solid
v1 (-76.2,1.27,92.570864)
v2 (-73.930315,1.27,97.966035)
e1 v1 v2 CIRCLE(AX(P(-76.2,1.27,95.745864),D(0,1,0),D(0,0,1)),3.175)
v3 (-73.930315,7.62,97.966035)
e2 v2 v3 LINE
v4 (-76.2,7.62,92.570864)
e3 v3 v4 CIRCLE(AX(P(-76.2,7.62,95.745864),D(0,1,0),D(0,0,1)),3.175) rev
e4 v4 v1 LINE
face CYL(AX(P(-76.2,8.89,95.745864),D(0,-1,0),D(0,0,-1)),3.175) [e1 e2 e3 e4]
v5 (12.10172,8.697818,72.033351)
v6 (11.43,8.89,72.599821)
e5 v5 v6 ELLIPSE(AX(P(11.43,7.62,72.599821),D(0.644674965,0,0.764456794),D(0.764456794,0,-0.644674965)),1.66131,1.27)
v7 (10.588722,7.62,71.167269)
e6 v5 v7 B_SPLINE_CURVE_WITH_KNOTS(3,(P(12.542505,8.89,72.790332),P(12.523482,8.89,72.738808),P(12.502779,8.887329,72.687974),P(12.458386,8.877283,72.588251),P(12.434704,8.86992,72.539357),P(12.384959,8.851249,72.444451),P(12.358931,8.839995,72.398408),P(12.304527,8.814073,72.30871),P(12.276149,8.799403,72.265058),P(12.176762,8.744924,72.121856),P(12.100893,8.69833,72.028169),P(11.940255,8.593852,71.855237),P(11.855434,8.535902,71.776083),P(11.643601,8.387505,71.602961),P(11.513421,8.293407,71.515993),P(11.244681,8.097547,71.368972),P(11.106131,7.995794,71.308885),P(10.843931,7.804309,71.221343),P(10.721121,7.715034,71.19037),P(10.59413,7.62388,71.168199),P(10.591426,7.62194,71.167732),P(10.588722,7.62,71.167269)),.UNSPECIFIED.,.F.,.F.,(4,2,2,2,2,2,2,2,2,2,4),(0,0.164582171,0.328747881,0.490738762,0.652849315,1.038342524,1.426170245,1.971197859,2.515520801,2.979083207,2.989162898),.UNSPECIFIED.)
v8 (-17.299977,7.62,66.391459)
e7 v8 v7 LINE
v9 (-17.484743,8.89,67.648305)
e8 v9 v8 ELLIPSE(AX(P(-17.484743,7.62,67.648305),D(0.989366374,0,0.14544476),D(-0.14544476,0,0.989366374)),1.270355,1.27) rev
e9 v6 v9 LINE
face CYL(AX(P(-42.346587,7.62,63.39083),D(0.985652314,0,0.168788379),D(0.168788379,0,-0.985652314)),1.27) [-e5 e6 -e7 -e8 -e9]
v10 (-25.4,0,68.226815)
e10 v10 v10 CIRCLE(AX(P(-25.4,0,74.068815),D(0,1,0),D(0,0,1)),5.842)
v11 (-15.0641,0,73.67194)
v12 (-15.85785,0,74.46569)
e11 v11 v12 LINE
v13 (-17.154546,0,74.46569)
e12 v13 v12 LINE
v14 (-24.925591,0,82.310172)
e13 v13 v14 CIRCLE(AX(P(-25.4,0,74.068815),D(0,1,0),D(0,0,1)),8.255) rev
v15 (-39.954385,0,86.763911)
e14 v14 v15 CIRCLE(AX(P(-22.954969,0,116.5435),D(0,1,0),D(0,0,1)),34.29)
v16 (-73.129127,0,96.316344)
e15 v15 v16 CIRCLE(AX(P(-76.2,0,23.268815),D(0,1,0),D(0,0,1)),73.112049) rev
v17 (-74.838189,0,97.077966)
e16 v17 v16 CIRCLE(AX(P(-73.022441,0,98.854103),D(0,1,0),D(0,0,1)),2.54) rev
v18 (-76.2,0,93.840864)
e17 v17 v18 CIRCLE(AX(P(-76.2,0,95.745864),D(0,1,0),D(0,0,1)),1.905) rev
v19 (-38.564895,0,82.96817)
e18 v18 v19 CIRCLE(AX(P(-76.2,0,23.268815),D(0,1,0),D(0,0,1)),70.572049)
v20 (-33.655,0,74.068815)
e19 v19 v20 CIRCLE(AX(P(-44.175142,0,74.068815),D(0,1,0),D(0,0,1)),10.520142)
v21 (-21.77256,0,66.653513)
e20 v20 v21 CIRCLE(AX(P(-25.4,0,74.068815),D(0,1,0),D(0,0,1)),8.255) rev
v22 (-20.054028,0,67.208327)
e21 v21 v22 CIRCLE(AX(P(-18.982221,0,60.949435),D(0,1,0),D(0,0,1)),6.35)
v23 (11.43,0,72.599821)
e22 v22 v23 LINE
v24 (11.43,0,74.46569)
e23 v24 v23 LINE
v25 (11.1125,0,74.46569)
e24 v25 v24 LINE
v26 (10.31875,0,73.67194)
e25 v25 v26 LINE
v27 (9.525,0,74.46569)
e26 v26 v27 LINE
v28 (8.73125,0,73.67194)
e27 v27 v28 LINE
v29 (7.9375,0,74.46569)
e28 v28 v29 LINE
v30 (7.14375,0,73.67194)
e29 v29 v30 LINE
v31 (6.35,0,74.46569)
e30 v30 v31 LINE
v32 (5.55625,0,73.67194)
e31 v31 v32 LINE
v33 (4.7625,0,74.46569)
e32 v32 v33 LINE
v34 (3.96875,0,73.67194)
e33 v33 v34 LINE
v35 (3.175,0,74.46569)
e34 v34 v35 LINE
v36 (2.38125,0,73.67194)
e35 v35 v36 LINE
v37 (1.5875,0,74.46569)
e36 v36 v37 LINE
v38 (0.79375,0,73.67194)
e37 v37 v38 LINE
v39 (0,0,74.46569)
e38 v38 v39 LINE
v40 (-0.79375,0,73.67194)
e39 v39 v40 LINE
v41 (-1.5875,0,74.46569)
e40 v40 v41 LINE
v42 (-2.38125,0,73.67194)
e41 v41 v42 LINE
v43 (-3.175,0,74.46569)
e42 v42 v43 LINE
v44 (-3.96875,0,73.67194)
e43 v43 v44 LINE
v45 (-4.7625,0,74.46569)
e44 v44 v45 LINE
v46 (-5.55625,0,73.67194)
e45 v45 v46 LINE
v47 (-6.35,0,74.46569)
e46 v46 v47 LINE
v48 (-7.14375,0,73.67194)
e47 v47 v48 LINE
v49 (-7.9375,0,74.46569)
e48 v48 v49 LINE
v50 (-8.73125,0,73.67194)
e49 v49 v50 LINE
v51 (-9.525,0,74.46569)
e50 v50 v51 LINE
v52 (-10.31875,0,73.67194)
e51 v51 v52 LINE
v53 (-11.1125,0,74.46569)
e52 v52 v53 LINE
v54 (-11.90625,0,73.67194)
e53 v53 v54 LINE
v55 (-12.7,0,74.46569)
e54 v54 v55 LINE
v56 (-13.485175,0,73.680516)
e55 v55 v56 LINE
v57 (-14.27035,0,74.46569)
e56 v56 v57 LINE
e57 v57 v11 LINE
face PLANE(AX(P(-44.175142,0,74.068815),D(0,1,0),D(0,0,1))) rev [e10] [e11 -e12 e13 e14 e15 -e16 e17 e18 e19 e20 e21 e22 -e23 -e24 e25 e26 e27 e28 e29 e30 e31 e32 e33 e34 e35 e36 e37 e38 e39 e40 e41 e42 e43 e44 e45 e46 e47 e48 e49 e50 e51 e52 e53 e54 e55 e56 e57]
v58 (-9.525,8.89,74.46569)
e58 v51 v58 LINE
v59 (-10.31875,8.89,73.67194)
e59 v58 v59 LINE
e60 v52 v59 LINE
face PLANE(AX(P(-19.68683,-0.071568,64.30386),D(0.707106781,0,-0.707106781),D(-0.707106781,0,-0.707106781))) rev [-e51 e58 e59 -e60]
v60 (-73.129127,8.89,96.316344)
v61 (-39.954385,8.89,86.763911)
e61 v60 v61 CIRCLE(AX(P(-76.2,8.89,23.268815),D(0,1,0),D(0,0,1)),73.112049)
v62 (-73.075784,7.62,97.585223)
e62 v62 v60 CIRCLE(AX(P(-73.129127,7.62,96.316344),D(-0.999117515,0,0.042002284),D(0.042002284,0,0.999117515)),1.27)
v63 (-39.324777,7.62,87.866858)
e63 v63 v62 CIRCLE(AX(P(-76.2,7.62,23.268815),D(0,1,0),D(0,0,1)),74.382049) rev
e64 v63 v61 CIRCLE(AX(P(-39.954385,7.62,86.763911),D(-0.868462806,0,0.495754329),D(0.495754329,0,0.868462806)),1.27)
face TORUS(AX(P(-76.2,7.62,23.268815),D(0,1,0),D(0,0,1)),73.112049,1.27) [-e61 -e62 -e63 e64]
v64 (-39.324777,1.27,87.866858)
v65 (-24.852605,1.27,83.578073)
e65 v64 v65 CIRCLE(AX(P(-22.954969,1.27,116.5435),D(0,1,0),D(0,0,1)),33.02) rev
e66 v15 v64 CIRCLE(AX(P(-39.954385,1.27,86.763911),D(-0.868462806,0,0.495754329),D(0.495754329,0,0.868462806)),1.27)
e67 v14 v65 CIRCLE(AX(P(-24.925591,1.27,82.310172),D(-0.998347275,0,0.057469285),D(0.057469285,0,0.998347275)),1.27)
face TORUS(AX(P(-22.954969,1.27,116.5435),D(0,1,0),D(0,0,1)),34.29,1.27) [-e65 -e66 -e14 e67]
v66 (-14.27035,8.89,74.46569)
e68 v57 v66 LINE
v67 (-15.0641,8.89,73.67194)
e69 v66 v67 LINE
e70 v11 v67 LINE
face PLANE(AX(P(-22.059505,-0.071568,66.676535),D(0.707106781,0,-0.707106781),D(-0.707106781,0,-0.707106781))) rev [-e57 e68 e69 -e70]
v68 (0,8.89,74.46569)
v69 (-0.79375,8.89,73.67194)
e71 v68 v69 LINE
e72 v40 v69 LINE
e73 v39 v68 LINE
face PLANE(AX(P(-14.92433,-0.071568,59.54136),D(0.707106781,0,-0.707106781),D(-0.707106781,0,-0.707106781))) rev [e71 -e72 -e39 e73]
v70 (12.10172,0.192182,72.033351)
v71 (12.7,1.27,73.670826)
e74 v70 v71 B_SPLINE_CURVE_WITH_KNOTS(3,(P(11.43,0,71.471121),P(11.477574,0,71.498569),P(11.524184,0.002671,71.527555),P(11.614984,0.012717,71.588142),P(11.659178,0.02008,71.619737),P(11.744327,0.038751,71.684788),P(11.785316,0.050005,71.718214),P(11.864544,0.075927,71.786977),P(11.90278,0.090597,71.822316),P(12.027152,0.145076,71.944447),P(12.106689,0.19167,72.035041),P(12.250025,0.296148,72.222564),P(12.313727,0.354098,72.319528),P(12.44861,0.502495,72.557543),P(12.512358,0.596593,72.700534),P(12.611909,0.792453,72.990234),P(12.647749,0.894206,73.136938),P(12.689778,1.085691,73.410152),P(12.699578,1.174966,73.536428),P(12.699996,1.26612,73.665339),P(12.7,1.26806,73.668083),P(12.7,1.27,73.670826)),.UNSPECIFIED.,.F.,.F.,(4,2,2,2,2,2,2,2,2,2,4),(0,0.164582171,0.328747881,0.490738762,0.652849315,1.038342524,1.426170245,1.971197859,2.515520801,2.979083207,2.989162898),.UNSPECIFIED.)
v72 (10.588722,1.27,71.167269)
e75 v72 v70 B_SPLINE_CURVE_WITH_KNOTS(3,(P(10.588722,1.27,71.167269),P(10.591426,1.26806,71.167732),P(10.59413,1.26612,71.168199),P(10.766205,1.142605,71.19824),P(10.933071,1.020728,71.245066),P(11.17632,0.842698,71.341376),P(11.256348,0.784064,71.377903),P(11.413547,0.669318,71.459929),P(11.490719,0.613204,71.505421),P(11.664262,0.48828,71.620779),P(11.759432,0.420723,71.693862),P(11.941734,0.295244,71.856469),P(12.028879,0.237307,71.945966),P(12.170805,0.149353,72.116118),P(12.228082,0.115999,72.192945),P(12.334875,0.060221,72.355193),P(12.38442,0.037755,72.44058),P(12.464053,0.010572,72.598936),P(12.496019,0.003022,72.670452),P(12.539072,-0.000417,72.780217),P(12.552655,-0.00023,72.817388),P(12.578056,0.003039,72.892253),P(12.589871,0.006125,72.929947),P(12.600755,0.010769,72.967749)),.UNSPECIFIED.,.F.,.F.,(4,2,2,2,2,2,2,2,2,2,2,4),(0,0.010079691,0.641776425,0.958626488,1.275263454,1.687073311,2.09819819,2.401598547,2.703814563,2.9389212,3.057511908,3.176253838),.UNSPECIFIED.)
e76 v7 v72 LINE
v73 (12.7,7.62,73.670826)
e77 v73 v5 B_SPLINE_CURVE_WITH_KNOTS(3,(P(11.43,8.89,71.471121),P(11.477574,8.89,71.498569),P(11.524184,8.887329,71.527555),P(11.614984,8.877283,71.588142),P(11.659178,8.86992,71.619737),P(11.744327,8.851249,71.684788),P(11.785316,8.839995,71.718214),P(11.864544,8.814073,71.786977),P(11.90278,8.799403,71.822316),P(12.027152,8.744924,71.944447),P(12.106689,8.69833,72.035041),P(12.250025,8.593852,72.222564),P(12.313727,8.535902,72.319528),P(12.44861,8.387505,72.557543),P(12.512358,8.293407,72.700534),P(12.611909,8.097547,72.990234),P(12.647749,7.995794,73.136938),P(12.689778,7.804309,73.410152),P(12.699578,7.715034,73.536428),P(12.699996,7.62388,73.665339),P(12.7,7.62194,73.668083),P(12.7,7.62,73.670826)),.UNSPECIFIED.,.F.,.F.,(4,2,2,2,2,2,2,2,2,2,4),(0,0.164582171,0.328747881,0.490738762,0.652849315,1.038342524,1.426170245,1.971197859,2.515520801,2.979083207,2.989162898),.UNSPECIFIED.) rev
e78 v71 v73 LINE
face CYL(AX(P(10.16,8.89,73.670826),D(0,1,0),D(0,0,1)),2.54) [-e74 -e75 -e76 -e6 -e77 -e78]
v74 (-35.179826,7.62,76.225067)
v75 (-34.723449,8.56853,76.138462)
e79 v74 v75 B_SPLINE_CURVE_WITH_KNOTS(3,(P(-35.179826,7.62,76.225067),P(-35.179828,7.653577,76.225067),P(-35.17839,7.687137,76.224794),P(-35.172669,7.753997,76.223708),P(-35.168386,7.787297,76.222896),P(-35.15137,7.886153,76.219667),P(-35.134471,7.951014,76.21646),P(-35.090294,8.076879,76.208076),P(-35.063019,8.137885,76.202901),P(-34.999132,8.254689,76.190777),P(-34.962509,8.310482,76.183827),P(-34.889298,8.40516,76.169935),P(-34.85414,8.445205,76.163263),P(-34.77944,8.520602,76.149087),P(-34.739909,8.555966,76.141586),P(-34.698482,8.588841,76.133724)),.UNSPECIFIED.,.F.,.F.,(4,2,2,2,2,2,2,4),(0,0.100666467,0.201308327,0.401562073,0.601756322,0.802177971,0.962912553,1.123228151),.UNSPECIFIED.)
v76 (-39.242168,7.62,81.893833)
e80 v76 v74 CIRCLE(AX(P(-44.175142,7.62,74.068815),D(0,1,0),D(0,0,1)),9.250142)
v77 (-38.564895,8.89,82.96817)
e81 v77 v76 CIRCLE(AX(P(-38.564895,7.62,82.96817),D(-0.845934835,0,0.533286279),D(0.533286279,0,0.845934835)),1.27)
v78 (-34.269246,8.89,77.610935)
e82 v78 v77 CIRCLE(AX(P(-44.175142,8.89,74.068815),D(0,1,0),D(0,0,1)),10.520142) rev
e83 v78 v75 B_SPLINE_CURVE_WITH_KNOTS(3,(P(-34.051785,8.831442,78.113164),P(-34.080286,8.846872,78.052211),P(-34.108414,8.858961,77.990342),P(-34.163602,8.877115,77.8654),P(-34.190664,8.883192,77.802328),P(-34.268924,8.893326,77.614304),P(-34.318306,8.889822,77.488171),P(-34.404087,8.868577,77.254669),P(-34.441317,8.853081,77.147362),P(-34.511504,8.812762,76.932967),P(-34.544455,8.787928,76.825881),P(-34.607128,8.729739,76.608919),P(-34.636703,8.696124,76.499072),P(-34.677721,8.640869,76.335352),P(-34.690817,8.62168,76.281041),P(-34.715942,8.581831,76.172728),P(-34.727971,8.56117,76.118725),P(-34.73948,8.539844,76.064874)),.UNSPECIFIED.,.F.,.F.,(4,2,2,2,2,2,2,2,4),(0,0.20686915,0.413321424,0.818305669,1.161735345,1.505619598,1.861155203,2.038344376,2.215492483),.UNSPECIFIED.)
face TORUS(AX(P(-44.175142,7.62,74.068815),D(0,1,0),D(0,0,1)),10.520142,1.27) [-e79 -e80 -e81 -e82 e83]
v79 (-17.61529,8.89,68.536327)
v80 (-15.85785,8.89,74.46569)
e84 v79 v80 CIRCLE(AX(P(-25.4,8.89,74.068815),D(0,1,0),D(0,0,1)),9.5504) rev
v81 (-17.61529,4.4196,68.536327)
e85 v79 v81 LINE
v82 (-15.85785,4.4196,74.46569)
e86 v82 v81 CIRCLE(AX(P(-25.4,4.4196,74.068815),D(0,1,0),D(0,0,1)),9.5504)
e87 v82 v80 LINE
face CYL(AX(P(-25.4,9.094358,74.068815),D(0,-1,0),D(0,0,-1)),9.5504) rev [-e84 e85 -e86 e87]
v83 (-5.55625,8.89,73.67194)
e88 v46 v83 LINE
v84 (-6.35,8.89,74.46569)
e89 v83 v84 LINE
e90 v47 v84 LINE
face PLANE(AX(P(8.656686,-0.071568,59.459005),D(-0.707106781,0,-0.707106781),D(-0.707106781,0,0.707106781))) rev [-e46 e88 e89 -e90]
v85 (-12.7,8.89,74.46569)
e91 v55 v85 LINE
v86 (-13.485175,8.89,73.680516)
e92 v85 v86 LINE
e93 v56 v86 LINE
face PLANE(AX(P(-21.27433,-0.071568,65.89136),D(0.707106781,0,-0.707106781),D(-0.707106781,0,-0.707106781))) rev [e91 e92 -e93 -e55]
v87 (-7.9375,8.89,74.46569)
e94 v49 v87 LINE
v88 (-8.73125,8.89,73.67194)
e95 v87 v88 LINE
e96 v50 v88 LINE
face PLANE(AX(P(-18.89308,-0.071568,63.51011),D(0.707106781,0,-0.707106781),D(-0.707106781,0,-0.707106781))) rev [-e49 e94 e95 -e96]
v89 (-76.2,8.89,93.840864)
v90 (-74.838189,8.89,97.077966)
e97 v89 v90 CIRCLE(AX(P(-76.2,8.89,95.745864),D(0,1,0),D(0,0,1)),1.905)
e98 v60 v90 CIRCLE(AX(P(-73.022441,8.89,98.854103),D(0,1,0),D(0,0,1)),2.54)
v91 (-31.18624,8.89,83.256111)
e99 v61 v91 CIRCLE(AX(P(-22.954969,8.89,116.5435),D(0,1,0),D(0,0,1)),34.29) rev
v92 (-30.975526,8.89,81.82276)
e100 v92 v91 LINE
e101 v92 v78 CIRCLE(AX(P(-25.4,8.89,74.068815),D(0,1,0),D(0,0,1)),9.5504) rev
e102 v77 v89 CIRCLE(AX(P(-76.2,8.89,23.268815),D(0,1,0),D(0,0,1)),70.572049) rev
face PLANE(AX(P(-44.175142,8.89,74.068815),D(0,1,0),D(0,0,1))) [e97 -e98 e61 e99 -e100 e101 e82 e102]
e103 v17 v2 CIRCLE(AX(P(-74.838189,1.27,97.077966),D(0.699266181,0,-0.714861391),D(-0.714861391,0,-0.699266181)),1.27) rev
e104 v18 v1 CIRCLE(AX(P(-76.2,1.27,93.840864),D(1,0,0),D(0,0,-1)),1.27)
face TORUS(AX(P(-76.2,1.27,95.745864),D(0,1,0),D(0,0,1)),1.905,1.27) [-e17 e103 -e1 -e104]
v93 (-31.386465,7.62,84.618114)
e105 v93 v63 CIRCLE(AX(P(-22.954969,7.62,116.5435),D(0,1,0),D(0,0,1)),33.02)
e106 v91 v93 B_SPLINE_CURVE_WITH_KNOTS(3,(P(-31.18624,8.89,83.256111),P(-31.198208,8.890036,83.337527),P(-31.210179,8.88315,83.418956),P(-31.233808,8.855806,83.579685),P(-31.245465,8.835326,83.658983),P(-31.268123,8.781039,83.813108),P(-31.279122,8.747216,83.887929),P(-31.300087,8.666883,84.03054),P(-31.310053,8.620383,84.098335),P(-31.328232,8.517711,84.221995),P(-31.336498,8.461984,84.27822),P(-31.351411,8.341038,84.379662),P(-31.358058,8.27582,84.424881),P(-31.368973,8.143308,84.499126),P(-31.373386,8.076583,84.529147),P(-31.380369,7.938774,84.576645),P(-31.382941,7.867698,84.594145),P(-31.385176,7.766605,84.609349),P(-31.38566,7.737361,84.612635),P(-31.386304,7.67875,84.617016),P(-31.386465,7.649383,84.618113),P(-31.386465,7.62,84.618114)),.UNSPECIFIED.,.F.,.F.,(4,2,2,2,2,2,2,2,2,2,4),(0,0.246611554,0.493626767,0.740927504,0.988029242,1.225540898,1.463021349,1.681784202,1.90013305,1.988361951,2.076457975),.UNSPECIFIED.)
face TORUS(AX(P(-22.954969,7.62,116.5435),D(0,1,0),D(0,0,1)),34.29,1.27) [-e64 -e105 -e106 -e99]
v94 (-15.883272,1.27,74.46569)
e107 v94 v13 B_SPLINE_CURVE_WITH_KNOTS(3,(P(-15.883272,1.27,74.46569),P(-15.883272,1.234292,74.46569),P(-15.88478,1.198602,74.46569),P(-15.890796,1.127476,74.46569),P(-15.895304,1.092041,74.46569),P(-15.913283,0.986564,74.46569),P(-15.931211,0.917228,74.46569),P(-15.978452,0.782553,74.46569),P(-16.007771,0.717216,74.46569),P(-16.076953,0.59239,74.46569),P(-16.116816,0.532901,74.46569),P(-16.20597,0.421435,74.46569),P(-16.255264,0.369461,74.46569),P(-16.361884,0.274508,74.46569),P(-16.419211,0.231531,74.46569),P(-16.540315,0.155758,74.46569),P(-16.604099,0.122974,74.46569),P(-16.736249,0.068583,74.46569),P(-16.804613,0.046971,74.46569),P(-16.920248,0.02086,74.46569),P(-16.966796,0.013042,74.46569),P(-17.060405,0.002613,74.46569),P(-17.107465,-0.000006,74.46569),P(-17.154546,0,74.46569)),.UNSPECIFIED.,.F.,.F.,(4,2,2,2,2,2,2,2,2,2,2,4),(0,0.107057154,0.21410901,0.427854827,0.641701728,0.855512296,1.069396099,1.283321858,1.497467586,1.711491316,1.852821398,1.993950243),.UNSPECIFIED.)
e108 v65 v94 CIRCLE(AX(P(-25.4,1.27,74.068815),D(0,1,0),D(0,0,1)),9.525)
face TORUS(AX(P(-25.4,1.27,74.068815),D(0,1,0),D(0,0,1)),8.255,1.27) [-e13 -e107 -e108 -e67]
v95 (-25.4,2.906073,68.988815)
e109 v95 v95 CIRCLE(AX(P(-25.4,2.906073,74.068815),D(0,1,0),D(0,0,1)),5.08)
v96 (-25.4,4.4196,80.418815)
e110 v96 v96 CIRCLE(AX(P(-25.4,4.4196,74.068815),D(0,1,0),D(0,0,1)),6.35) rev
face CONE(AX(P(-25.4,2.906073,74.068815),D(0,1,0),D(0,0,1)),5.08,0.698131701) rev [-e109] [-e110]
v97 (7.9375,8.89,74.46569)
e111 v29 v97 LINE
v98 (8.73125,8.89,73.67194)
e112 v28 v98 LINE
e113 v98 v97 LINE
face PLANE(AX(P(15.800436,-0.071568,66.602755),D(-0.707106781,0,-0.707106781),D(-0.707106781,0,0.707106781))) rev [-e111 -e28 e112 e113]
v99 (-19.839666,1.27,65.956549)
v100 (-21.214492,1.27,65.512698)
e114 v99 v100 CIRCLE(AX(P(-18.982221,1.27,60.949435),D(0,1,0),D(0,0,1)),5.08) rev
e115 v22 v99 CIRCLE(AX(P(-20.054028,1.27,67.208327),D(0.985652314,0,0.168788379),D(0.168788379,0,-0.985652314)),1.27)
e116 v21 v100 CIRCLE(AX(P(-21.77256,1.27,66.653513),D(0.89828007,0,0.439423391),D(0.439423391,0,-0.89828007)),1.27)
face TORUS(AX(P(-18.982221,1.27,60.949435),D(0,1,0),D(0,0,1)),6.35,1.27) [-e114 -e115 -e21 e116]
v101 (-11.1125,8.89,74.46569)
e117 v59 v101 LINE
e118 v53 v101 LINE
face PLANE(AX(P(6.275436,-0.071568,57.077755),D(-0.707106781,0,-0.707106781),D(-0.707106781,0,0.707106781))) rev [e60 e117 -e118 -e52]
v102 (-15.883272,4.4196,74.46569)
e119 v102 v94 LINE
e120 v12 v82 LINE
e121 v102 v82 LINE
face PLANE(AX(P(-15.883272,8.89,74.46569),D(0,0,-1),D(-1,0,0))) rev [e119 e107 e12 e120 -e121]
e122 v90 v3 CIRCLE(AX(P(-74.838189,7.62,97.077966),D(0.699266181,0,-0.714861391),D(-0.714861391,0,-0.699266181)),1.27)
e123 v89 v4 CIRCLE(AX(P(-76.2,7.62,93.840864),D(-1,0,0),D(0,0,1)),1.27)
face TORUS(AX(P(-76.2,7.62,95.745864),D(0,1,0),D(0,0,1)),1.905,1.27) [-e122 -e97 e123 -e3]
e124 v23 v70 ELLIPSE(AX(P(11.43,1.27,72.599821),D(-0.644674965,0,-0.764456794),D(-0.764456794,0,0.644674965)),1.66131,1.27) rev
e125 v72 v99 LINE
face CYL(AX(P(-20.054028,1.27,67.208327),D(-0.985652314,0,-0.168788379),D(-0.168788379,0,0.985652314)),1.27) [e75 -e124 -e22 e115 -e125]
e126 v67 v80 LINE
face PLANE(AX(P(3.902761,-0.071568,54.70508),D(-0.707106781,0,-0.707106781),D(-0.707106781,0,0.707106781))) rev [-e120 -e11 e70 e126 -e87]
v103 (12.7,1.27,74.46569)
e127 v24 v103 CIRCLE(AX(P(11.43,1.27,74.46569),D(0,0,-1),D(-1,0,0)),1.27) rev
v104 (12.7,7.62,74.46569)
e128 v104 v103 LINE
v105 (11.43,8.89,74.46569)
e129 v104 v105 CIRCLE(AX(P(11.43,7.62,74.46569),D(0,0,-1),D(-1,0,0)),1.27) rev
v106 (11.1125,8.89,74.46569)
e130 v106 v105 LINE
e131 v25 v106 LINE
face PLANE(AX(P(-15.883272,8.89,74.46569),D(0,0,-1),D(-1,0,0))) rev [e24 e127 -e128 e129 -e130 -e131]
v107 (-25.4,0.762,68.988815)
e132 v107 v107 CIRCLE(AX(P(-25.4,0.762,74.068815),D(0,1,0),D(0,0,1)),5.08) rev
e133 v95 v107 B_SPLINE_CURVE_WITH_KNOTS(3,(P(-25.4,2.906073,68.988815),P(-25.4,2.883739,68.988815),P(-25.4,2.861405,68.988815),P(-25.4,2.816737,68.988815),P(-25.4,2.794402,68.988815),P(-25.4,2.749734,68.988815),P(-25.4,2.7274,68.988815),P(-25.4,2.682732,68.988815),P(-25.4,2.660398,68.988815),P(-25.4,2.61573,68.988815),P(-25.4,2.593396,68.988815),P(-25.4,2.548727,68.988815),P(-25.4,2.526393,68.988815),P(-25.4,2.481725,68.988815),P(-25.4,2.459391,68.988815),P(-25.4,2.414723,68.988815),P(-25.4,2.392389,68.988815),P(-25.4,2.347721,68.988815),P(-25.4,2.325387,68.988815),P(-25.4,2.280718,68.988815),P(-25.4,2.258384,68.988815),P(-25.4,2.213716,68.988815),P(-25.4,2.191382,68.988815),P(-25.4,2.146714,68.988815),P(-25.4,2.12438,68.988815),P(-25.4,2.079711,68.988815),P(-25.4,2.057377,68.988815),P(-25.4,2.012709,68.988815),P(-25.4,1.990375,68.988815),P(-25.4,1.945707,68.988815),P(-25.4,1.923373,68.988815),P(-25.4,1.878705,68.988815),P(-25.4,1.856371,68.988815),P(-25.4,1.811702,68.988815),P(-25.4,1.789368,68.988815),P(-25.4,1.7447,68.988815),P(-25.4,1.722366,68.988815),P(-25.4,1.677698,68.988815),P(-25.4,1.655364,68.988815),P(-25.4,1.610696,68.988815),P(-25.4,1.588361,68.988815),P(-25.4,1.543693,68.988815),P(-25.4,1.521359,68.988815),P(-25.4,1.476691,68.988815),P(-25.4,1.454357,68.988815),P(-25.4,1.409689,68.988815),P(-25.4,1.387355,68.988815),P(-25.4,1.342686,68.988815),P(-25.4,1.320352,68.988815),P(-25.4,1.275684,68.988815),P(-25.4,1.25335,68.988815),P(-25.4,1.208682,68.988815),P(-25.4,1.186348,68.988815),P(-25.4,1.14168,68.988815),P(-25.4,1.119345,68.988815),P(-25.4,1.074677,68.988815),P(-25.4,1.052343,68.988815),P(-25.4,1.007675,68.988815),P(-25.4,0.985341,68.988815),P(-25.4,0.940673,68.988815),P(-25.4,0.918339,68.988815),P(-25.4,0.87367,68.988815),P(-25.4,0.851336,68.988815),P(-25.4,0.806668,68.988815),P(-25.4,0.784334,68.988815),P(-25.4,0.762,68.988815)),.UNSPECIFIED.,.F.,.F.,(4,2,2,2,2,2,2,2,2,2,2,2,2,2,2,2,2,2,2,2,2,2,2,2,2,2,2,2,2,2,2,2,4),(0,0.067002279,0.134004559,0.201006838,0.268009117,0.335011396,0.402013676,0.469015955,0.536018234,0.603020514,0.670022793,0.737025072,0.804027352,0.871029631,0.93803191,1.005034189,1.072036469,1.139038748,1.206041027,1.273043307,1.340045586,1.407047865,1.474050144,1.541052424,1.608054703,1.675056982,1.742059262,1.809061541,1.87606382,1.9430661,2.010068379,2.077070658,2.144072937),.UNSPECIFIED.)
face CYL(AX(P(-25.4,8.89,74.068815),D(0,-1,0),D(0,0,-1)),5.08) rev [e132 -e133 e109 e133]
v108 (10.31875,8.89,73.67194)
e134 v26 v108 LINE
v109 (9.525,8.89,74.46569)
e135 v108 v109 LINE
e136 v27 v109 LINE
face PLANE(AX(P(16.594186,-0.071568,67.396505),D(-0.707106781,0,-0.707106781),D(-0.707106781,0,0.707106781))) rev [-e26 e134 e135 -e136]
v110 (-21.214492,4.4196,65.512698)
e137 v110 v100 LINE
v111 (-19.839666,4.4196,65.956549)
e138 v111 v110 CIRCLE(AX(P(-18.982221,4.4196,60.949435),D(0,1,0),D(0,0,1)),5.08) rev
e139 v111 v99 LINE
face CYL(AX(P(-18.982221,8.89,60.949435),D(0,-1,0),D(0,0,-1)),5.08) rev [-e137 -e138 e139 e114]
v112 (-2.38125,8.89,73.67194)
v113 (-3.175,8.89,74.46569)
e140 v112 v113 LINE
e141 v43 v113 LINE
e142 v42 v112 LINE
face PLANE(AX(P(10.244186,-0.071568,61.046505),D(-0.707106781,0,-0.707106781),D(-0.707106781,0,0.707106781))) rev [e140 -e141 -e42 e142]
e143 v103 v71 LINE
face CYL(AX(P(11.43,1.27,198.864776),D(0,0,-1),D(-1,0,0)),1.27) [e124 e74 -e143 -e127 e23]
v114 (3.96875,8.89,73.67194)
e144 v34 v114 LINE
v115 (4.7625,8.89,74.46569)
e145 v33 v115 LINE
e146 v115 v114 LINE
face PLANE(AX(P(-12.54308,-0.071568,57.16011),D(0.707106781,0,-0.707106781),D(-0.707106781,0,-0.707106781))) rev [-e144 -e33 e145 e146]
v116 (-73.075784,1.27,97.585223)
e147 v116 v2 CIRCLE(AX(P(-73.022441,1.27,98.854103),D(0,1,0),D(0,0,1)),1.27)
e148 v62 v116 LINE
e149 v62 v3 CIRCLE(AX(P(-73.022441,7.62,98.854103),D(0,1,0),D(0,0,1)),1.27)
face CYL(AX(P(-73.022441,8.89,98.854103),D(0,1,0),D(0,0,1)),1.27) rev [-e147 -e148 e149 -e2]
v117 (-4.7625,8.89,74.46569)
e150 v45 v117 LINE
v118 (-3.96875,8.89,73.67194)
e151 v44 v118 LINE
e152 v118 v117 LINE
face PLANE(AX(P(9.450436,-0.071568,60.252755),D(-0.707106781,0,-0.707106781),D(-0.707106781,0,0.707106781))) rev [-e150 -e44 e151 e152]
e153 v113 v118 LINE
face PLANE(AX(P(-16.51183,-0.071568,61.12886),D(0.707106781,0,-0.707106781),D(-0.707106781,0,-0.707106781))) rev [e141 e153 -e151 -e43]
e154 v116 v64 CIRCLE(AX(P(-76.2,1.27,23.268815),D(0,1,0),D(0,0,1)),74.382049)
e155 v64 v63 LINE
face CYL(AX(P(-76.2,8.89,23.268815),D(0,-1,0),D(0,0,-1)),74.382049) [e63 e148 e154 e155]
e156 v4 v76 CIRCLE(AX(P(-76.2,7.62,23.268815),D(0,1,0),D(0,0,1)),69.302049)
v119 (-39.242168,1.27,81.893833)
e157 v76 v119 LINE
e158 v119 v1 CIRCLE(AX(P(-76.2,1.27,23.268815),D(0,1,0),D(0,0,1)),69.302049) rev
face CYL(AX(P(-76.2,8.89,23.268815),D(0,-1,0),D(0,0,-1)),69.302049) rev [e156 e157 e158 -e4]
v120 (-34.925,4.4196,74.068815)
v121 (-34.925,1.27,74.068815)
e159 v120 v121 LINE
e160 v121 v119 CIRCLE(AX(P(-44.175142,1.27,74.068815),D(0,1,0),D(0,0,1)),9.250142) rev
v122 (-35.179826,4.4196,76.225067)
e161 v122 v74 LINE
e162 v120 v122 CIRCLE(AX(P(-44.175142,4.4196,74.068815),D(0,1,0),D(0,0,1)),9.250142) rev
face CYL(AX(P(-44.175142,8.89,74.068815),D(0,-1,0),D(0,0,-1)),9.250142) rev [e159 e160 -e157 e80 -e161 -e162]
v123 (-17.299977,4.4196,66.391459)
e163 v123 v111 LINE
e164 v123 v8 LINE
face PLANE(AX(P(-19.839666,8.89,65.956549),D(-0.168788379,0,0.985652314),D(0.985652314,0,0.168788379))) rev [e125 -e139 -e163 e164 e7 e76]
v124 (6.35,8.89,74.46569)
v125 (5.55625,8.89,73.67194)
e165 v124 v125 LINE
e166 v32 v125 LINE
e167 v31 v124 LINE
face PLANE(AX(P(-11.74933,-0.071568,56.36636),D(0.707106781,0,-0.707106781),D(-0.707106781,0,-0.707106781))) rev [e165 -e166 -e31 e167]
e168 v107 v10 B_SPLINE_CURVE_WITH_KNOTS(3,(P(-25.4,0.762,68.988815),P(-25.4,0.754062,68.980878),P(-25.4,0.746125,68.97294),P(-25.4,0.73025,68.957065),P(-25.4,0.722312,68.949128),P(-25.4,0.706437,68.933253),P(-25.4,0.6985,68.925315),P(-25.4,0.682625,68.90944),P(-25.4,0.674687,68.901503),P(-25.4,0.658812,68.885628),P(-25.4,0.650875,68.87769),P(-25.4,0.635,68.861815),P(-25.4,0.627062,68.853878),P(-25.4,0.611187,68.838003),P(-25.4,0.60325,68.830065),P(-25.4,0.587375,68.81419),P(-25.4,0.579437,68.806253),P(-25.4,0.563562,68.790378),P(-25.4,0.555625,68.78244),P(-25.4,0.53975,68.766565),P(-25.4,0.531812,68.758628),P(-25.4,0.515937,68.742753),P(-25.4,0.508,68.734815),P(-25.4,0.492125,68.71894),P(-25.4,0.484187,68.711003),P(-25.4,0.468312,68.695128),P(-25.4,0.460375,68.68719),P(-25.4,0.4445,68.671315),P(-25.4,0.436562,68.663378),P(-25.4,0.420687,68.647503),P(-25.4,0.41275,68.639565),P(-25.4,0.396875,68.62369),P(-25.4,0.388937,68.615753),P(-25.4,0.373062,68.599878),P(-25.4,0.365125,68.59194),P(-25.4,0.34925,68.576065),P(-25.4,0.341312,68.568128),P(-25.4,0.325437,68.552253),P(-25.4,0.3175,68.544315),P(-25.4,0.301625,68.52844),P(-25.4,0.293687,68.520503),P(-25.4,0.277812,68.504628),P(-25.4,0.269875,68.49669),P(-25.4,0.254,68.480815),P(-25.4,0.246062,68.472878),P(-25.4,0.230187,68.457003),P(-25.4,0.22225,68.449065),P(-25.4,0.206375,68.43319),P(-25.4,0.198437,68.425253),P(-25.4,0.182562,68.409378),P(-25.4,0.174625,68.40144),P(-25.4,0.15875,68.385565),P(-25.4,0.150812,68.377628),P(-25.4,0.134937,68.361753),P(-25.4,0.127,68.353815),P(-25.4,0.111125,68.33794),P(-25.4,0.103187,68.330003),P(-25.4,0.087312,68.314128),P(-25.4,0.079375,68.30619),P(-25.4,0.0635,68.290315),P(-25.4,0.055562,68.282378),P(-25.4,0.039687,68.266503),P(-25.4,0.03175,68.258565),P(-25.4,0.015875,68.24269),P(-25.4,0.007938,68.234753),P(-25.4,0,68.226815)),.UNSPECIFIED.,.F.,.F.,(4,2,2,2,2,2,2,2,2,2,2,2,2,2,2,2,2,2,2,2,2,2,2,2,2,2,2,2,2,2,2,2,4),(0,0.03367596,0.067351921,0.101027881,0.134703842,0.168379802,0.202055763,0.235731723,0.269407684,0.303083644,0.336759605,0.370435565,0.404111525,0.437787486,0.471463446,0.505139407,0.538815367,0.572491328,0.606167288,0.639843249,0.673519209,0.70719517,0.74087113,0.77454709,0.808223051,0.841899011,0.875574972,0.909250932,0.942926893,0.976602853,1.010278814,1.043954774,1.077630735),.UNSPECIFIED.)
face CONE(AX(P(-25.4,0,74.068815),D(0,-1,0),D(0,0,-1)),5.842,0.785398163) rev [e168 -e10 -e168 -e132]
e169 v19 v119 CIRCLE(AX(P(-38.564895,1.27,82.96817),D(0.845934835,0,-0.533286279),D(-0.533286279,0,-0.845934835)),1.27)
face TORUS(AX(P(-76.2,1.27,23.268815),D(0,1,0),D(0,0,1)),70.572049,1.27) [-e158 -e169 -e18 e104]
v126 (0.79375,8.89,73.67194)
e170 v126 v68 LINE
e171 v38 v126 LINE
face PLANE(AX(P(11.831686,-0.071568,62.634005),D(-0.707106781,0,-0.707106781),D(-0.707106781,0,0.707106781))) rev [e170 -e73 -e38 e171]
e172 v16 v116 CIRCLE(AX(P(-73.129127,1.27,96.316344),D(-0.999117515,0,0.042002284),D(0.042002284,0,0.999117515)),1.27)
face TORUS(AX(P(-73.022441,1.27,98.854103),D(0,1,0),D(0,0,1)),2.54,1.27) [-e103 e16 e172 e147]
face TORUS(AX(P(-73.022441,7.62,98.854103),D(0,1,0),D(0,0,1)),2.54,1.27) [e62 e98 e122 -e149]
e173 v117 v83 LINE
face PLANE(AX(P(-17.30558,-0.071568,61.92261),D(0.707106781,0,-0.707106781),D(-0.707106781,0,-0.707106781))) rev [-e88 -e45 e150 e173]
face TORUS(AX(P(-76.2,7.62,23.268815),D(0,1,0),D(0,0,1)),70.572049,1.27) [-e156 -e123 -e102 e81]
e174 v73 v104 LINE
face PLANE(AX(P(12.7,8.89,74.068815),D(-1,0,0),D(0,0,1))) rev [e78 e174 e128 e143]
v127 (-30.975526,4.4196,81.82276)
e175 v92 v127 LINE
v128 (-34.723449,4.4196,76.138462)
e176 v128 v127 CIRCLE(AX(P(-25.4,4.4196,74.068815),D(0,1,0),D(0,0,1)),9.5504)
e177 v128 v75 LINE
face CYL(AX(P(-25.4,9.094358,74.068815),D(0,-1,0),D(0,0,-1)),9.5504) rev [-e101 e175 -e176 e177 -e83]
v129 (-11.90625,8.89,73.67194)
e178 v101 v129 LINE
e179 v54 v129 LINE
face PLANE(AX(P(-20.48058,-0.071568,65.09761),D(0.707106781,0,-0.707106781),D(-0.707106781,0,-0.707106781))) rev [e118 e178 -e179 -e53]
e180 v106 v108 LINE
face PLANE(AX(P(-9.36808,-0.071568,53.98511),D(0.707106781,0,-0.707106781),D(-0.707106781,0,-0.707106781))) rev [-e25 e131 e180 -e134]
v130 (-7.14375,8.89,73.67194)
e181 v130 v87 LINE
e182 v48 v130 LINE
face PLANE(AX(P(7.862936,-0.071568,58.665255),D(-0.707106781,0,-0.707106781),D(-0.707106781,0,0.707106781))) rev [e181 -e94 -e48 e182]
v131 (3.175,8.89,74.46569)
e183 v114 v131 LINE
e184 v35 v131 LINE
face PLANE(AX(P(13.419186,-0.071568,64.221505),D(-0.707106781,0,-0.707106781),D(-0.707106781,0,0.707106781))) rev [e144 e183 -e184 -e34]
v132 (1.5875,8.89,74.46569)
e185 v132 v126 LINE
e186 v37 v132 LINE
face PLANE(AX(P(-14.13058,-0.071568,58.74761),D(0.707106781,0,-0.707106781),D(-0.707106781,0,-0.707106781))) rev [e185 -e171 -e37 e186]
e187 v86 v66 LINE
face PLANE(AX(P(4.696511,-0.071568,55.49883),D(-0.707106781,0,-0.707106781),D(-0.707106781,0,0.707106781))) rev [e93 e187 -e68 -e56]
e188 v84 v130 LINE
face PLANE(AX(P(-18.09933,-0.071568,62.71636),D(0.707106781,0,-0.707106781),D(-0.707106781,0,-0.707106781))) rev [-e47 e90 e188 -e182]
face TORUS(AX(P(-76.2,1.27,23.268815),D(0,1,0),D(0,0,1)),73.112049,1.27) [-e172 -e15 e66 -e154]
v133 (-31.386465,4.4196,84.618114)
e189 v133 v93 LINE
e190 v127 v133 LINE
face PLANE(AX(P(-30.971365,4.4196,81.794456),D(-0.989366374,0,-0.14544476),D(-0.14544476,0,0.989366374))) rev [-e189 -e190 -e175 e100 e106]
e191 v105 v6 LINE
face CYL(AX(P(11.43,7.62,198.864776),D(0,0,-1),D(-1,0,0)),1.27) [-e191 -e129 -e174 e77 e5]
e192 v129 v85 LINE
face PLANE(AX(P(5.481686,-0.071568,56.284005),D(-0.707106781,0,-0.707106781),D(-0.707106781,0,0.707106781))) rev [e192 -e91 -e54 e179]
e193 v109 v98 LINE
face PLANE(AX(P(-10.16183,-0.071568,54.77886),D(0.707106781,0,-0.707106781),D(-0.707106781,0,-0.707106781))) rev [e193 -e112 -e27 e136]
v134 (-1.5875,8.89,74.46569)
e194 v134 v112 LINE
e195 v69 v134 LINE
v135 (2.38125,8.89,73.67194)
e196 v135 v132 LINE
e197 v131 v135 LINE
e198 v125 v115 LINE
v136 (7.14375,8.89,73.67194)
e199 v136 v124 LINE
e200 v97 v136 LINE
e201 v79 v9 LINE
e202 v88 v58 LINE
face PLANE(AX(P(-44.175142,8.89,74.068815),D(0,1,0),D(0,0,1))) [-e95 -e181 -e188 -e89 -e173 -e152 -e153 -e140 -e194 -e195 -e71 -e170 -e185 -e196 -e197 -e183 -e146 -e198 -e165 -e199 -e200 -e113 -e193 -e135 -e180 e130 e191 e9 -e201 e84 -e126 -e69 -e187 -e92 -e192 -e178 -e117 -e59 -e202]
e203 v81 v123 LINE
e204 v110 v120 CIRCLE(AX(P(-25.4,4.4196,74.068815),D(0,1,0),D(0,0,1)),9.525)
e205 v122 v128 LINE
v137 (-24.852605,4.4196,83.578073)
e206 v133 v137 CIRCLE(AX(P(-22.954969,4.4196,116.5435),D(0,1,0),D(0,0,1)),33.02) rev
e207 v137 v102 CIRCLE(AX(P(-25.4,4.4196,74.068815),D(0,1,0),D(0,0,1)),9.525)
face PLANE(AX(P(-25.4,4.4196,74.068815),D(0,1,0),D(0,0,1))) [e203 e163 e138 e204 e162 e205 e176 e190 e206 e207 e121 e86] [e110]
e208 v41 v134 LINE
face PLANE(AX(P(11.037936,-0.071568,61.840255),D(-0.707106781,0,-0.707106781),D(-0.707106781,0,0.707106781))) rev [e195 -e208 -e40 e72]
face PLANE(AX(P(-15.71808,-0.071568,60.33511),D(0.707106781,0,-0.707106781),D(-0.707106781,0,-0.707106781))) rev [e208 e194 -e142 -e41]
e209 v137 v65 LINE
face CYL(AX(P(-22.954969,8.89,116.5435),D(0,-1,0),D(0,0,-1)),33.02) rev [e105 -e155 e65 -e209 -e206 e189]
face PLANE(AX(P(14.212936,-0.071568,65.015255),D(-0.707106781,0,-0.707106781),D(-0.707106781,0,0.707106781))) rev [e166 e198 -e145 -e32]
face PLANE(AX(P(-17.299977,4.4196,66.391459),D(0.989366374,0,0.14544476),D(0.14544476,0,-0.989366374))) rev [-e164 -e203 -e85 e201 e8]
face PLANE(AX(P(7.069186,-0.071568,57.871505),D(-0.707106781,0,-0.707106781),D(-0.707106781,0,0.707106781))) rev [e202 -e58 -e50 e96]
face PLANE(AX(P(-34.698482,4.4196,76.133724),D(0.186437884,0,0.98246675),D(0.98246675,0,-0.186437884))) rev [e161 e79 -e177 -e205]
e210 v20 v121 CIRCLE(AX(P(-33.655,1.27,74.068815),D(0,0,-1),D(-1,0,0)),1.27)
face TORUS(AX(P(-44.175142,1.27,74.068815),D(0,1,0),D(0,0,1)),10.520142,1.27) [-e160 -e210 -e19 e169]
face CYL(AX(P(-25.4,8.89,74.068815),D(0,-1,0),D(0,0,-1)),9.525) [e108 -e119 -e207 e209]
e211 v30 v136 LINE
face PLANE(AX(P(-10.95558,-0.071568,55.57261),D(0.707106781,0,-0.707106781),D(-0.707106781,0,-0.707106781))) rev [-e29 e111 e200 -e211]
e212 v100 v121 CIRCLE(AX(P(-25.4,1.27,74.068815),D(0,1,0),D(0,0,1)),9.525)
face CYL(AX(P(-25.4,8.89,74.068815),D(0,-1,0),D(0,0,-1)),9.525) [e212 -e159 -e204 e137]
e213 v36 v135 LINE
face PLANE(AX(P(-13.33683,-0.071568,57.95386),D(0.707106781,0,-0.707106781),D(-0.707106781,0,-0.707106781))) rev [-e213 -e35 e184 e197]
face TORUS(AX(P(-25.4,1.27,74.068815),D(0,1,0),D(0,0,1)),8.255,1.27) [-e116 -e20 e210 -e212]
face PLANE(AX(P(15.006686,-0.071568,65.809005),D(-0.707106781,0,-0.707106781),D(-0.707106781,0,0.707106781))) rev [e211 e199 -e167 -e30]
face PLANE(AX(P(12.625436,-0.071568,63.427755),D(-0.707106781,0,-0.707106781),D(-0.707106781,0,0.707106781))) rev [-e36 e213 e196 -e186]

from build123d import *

# Parameters (mm, degrees)
SKETCH1_R               = 5.08
EXTRUDE1_DEPTH          = 8.89
FILLET3_R               = 33.02
CUT_EXTRUDE1_START      = -4.4704
CUT_EXTRUDE1_DEPTH      = 4.4704
FILLET4_R               = 1.27
FILLET7_R               = 1.27
FILLET8_R               = 2.54
CUT_EXTRUDE4_START      = -2.4323391
CUT_EXTRUDE4_DEPTH      = 2.4323391
SKETCH7_R               = 9.5504
CUT_EXTRUDE5_DEPTH      = 127.908284031
CHAMFER1_SIZE           = 0.762
CHAMFER2_SIZE           = 1.27
CHAMFER2_SIZE2          = 1.513527063
CUT_EXTRUDE7_DEPTH      = 128.140710162
CUT_EXTRUDE7_DEPTH_BACK = 128.140710162


# Read off the part's stored shape, not the designer's step: Cut-Extrude4
with BuildPart() as part:
    # Sketch1 → Extrude1 (new body)
    with BuildSketch(Plane(origin=(0, 0, 0), x_dir=(1, 0, 0), z_dir=(0, 1, 0))):
        with BuildLine():
            Line((12.7, -74.068815454), (12.7, -71.528815454))
            Line((12.7, -71.528815454), (-19.839666339, -65.95654879))
            ThreePointArc((-19.839666339, -65.95654879), (-20.542938147, -65.783746069), (-21.214492201, -65.512697791))
            ThreePointArc((-21.214492201, -65.512697791), (-28.50851165, -65.065328333), (-33.972800967, -69.917585685))
            ThreePointArc((-33.972800967, -69.917585685), (-34.683898809, -71.939297222), (-34.925, -74.068815454))
            ThreePointArc((-34.925, -74.068815454), (-36.075887863, -78.537283812), (-39.242168201, -81.893832809))
            ThreePointArc((-39.242168201, -81.893832809), (-56.965393588, -89.848120853), (-76.2, -92.570864422))
            ThreePointArc((-76.2, -92.570864422), (-79.027338631, -97.190434), (-73.627220553, -97.606356539))
            ThreePointArc((-73.627220553, -97.606356539), (-50.892740286, -93.213306405), (-30.610706836, -82.042155988))
            ThreePointArc((-30.610706836, -82.042155988), (-21.042688621, -82.538730598), (-15.883271821, -74.465690454))
            Line((-15.883271821, -74.465690454), (12.7, -74.465690454))
            Line((12.7, -74.465690454), (12.7, -74.068815454))
        make_face()
        with Locations(Location((-25.4, -74.068815454, 0), (0, 0, 270))):
            Circle(SKETCH1_R, mode=Mode.SUBTRACT)
    extrude(amount=EXTRUDE1_DEPTH)

    # Fillet3
    fillet3_edges = [part.edges().sort_by_distance(p)[0] for p in [
        (-30.610706836, 4.445, 82.042155988),
    ]]
    fillet(fillet3_edges, radius=FILLET3_R)

    # Sketch4 → Cut-Extrude1 (cut)
    with BuildSketch(Plane(origin=(0, 8.89, 0), x_dir=(-1, 0, 0), z_dir=(0, 1, 0)).offset(CUT_EXTRUDE1_START)):
        with BuildLine():
            Line((17.299976936, 66.391458799), (17.620638494, 68.572711419))
            ThreePointArc((17.620638494, 68.572711419), (16.819560669, 78.20423392), (24.852605063, 83.578073247))
            Line((24.852605063, 83.578073247), (24.852605063, 89.837842614))
            Line((24.852605063, 89.837842614), (32.15380679, 89.837842614))
            Line((32.15380679, 89.837842614), (30.971364696, 81.794455907))
            ThreePointArc((30.971364696, 81.794455907), (33.355442096, 79.306808013), (34.698482461, 76.13372439))
            Line((34.698482461, 76.13372439), (35.179826108, 76.225066607))
            Line((35.179826108, 76.225066607), (37.134154695, 72.138642589))
            Line((37.134154695, 72.138642589), (28.798402731, 58.612170247))
            Line((28.798402731, 58.612170247), (17.299976936, 66.391458799))
        make_face()
    extrude(amount=CUT_EXTRUDE1_DEPTH, mode=Mode.SUBTRACT)

    # Fillet4
    fillet4_edges = [part.edges().sort_by_distance(p)[0] for p in [
        (-56.965393588, 8.89, 89.848120853),
        (-56.965393588, 0, 89.848120853),
        (-79.027338631, 8.89, 97.190434),
        (-79.027338631, 0, 97.190434),
        (-35.461557578, 8.89, 85.983630351),
        (-18.611736336, 0, 80.750514447),
        (-32.337042326, 0, 84.884424071),
        (-73.627220553, 4.445, 97.606356539),
        (-55.883733715, 8.89, 94.822561219),
        (-55.883733715, 0, 94.822561219),
        (-3.569833169, 0, 68.742682122),
        (-30.442750401, 0, 65.988203262),
        (-36.656296279, 8.89, 79.456958555),
        (-36.075887863, 0, 78.537283812),
        (-20.542938147, 0, 65.783746069),
    ]]
    fillet(fillet4_edges, radius=FILLET4_R)

    # Fillet7
    fillet7_edges = [part.edges().sort_by_distance(p)[0] for p in [
        (-2.299988468, 8.89, 68.960137126),
    ]]
    fillet(fillet7_edges, radius=FILLET7_R)

    # Fillet8
    # the kernel refuses this fillet: 2.54 mm, written as the material it takes off along each edge
    with BuildSketch(Plane(origin=(12.7, -4.085026029, 71.528815454), x_dir=(-0.9856523135338612, 0, -0.1687883788219644), z_dir=(0, 1, 0))) as fillet8_piece_1:
        with BuildLine():
            CenterArc((FILLET8_R * 0.843311185663, FILLET8_R), FILLET8_R, 189.717380318, 80.282619682)
            Line((-FILLET8_R * 0.142341127871, FILLET8_R * 0.831211621178), (0, 0))
            Line((0, 0), (FILLET8_R * 0.843311185663, 0))
        make_face()
    extrude(amount=17.060052058, mode=Mode.SUBTRACT)

    # Cut-Extrude4 outline → Cut-Extrude4 (cut)
    with BuildSketch(Plane.XY.offset(74.465690454).offset(CUT_EXTRUDE4_START)):
        with BuildLine():
            Line((12.7, 0), (12.7, 1.27))
            ThreePointArc((12.7, 1.27), (12.328025612, 0.371974388), (11.43, 0))
            Line((11.43, 0), (12.7, 0))
        make_face()
        with BuildLine():
            ThreePointArc((11.43, 8.89), (12.328025612, 8.518025612), (12.7, 7.62))
            Line((12.7, 7.62), (12.7, 8.89))
            Line((12.7, 8.89), (11.43, 8.89))
        make_face()
    extrude(amount=CUT_EXTRUDE4_DEPTH, mode=Mode.SUBTRACT)

    # Sketch7 → Cut-Extrude5 (cut, through all)
    with BuildSketch(Plane(origin=(0, 4.4196, 0), x_dir=(-1, 0, 0), z_dir=(0, 1, 0))):
        with Locations((25.4, 74.068815454)):
            Circle(SKETCH7_R)
    extrude(amount=CUT_EXTRUDE5_DEPTH, mode=Mode.SUBTRACT)

    # Chamfer1
    chamfer1_edges = [part.edges().sort_by_distance(p)[0] for p in [
        (-25.4, 0, 68.988815454),
    ]]
    chamfer(chamfer1_edges, length=CHAMFER1_SIZE)

    # Chamfer2
    chamfer2_edges = [part.edges().sort_by_distance(p)[0] for p in [
        (-25.4, 4.4196, 68.988815454),
    ]]
    chamfer2_side = [part.faces().sort_by_distance(p)[0] for p in [
        (-18.616859876, 4.4196, 66.448687097),
    ]]
    chamfer(chamfer2_edges, length=CHAMFER2_SIZE, length2=CHAMFER2_SIZE2, reference=chamfer2_side[0])

    # Sketch9 → Cut-Extrude7 (cut, two sides: drawn at the far end of the back side and taken through both)
    with BuildSketch(Plane(origin=(0, 8.89, 0), x_dir=(-1, 0, 0), z_dir=(0, 1, 0)).offset(-CUT_EXTRUDE7_DEPTH_BACK)):
        Polygon((0.79375, 73.671940454), (1.5875, 74.465690454), (0, 74.465690454), align=None)
        Polygon((2.38125, 73.671940454), (3.175, 74.465690454), (1.5875, 74.465690454), align=None)
        Polygon((3.96875, 73.671940454), (4.7625, 74.465690454), (3.175, 74.465690454), align=None)
        Polygon((11.90625, 73.671940454), (12.7, 74.465690454), (11.1125, 74.465690454), align=None)
        Polygon((13.485174901, 73.680515552), (14.270349802, 74.465690454), (12.7, 74.465690454), align=None)
        Polygon((10.31875, 73.671940454), (11.1125, 74.465690454), (9.525, 74.465690454), align=None)
        Polygon((8.73125, 73.671940454), (9.525, 74.465690454), (7.9375, 74.465690454), align=None)
        Polygon((7.14375, 73.671940454), (7.9375, 74.465690454), (6.35, 74.465690454), align=None)
        Polygon((5.55625, 73.671940454), (6.35, 74.465690454), (4.7625, 74.465690454), align=None)
        Polygon((15.064099802, 73.671940454), (15.857849802, 74.465690454), (14.270349802, 74.465690454), align=None)
        Polygon((-0.79375, 73.671940454), (0, 74.465690454), (-1.5875, 74.465690454), align=None)
        Polygon((-2.38125, 73.671940454), (-1.5875, 74.465690454), (-3.175, 74.465690454), align=None)
        Polygon((-3.96875, 73.671940454), (-3.175, 74.465690454), (-4.7625, 74.465690454), align=None)
        Polygon((-5.55625, 73.671940454), (-4.7625, 74.465690454), (-6.35, 74.465690454), align=None)
        Polygon((-7.14375, 73.671940454), (-6.35, 74.465690454), (-7.9375, 74.465690454), align=None)
        Polygon((-8.73125, 73.671940454), (-7.9375, 74.465690454), (-9.525, 74.465690454), align=None)
        Polygon((-10.31875, 73.671940454), (-9.525, 74.465690454), (-11.1125, 74.465690454), align=None)
    extrude(amount=CUT_EXTRUDE7_DEPTH + CUT_EXTRUDE7_DEPTH_BACK, mode=Mode.SUBTRACT)


solid = part.part
